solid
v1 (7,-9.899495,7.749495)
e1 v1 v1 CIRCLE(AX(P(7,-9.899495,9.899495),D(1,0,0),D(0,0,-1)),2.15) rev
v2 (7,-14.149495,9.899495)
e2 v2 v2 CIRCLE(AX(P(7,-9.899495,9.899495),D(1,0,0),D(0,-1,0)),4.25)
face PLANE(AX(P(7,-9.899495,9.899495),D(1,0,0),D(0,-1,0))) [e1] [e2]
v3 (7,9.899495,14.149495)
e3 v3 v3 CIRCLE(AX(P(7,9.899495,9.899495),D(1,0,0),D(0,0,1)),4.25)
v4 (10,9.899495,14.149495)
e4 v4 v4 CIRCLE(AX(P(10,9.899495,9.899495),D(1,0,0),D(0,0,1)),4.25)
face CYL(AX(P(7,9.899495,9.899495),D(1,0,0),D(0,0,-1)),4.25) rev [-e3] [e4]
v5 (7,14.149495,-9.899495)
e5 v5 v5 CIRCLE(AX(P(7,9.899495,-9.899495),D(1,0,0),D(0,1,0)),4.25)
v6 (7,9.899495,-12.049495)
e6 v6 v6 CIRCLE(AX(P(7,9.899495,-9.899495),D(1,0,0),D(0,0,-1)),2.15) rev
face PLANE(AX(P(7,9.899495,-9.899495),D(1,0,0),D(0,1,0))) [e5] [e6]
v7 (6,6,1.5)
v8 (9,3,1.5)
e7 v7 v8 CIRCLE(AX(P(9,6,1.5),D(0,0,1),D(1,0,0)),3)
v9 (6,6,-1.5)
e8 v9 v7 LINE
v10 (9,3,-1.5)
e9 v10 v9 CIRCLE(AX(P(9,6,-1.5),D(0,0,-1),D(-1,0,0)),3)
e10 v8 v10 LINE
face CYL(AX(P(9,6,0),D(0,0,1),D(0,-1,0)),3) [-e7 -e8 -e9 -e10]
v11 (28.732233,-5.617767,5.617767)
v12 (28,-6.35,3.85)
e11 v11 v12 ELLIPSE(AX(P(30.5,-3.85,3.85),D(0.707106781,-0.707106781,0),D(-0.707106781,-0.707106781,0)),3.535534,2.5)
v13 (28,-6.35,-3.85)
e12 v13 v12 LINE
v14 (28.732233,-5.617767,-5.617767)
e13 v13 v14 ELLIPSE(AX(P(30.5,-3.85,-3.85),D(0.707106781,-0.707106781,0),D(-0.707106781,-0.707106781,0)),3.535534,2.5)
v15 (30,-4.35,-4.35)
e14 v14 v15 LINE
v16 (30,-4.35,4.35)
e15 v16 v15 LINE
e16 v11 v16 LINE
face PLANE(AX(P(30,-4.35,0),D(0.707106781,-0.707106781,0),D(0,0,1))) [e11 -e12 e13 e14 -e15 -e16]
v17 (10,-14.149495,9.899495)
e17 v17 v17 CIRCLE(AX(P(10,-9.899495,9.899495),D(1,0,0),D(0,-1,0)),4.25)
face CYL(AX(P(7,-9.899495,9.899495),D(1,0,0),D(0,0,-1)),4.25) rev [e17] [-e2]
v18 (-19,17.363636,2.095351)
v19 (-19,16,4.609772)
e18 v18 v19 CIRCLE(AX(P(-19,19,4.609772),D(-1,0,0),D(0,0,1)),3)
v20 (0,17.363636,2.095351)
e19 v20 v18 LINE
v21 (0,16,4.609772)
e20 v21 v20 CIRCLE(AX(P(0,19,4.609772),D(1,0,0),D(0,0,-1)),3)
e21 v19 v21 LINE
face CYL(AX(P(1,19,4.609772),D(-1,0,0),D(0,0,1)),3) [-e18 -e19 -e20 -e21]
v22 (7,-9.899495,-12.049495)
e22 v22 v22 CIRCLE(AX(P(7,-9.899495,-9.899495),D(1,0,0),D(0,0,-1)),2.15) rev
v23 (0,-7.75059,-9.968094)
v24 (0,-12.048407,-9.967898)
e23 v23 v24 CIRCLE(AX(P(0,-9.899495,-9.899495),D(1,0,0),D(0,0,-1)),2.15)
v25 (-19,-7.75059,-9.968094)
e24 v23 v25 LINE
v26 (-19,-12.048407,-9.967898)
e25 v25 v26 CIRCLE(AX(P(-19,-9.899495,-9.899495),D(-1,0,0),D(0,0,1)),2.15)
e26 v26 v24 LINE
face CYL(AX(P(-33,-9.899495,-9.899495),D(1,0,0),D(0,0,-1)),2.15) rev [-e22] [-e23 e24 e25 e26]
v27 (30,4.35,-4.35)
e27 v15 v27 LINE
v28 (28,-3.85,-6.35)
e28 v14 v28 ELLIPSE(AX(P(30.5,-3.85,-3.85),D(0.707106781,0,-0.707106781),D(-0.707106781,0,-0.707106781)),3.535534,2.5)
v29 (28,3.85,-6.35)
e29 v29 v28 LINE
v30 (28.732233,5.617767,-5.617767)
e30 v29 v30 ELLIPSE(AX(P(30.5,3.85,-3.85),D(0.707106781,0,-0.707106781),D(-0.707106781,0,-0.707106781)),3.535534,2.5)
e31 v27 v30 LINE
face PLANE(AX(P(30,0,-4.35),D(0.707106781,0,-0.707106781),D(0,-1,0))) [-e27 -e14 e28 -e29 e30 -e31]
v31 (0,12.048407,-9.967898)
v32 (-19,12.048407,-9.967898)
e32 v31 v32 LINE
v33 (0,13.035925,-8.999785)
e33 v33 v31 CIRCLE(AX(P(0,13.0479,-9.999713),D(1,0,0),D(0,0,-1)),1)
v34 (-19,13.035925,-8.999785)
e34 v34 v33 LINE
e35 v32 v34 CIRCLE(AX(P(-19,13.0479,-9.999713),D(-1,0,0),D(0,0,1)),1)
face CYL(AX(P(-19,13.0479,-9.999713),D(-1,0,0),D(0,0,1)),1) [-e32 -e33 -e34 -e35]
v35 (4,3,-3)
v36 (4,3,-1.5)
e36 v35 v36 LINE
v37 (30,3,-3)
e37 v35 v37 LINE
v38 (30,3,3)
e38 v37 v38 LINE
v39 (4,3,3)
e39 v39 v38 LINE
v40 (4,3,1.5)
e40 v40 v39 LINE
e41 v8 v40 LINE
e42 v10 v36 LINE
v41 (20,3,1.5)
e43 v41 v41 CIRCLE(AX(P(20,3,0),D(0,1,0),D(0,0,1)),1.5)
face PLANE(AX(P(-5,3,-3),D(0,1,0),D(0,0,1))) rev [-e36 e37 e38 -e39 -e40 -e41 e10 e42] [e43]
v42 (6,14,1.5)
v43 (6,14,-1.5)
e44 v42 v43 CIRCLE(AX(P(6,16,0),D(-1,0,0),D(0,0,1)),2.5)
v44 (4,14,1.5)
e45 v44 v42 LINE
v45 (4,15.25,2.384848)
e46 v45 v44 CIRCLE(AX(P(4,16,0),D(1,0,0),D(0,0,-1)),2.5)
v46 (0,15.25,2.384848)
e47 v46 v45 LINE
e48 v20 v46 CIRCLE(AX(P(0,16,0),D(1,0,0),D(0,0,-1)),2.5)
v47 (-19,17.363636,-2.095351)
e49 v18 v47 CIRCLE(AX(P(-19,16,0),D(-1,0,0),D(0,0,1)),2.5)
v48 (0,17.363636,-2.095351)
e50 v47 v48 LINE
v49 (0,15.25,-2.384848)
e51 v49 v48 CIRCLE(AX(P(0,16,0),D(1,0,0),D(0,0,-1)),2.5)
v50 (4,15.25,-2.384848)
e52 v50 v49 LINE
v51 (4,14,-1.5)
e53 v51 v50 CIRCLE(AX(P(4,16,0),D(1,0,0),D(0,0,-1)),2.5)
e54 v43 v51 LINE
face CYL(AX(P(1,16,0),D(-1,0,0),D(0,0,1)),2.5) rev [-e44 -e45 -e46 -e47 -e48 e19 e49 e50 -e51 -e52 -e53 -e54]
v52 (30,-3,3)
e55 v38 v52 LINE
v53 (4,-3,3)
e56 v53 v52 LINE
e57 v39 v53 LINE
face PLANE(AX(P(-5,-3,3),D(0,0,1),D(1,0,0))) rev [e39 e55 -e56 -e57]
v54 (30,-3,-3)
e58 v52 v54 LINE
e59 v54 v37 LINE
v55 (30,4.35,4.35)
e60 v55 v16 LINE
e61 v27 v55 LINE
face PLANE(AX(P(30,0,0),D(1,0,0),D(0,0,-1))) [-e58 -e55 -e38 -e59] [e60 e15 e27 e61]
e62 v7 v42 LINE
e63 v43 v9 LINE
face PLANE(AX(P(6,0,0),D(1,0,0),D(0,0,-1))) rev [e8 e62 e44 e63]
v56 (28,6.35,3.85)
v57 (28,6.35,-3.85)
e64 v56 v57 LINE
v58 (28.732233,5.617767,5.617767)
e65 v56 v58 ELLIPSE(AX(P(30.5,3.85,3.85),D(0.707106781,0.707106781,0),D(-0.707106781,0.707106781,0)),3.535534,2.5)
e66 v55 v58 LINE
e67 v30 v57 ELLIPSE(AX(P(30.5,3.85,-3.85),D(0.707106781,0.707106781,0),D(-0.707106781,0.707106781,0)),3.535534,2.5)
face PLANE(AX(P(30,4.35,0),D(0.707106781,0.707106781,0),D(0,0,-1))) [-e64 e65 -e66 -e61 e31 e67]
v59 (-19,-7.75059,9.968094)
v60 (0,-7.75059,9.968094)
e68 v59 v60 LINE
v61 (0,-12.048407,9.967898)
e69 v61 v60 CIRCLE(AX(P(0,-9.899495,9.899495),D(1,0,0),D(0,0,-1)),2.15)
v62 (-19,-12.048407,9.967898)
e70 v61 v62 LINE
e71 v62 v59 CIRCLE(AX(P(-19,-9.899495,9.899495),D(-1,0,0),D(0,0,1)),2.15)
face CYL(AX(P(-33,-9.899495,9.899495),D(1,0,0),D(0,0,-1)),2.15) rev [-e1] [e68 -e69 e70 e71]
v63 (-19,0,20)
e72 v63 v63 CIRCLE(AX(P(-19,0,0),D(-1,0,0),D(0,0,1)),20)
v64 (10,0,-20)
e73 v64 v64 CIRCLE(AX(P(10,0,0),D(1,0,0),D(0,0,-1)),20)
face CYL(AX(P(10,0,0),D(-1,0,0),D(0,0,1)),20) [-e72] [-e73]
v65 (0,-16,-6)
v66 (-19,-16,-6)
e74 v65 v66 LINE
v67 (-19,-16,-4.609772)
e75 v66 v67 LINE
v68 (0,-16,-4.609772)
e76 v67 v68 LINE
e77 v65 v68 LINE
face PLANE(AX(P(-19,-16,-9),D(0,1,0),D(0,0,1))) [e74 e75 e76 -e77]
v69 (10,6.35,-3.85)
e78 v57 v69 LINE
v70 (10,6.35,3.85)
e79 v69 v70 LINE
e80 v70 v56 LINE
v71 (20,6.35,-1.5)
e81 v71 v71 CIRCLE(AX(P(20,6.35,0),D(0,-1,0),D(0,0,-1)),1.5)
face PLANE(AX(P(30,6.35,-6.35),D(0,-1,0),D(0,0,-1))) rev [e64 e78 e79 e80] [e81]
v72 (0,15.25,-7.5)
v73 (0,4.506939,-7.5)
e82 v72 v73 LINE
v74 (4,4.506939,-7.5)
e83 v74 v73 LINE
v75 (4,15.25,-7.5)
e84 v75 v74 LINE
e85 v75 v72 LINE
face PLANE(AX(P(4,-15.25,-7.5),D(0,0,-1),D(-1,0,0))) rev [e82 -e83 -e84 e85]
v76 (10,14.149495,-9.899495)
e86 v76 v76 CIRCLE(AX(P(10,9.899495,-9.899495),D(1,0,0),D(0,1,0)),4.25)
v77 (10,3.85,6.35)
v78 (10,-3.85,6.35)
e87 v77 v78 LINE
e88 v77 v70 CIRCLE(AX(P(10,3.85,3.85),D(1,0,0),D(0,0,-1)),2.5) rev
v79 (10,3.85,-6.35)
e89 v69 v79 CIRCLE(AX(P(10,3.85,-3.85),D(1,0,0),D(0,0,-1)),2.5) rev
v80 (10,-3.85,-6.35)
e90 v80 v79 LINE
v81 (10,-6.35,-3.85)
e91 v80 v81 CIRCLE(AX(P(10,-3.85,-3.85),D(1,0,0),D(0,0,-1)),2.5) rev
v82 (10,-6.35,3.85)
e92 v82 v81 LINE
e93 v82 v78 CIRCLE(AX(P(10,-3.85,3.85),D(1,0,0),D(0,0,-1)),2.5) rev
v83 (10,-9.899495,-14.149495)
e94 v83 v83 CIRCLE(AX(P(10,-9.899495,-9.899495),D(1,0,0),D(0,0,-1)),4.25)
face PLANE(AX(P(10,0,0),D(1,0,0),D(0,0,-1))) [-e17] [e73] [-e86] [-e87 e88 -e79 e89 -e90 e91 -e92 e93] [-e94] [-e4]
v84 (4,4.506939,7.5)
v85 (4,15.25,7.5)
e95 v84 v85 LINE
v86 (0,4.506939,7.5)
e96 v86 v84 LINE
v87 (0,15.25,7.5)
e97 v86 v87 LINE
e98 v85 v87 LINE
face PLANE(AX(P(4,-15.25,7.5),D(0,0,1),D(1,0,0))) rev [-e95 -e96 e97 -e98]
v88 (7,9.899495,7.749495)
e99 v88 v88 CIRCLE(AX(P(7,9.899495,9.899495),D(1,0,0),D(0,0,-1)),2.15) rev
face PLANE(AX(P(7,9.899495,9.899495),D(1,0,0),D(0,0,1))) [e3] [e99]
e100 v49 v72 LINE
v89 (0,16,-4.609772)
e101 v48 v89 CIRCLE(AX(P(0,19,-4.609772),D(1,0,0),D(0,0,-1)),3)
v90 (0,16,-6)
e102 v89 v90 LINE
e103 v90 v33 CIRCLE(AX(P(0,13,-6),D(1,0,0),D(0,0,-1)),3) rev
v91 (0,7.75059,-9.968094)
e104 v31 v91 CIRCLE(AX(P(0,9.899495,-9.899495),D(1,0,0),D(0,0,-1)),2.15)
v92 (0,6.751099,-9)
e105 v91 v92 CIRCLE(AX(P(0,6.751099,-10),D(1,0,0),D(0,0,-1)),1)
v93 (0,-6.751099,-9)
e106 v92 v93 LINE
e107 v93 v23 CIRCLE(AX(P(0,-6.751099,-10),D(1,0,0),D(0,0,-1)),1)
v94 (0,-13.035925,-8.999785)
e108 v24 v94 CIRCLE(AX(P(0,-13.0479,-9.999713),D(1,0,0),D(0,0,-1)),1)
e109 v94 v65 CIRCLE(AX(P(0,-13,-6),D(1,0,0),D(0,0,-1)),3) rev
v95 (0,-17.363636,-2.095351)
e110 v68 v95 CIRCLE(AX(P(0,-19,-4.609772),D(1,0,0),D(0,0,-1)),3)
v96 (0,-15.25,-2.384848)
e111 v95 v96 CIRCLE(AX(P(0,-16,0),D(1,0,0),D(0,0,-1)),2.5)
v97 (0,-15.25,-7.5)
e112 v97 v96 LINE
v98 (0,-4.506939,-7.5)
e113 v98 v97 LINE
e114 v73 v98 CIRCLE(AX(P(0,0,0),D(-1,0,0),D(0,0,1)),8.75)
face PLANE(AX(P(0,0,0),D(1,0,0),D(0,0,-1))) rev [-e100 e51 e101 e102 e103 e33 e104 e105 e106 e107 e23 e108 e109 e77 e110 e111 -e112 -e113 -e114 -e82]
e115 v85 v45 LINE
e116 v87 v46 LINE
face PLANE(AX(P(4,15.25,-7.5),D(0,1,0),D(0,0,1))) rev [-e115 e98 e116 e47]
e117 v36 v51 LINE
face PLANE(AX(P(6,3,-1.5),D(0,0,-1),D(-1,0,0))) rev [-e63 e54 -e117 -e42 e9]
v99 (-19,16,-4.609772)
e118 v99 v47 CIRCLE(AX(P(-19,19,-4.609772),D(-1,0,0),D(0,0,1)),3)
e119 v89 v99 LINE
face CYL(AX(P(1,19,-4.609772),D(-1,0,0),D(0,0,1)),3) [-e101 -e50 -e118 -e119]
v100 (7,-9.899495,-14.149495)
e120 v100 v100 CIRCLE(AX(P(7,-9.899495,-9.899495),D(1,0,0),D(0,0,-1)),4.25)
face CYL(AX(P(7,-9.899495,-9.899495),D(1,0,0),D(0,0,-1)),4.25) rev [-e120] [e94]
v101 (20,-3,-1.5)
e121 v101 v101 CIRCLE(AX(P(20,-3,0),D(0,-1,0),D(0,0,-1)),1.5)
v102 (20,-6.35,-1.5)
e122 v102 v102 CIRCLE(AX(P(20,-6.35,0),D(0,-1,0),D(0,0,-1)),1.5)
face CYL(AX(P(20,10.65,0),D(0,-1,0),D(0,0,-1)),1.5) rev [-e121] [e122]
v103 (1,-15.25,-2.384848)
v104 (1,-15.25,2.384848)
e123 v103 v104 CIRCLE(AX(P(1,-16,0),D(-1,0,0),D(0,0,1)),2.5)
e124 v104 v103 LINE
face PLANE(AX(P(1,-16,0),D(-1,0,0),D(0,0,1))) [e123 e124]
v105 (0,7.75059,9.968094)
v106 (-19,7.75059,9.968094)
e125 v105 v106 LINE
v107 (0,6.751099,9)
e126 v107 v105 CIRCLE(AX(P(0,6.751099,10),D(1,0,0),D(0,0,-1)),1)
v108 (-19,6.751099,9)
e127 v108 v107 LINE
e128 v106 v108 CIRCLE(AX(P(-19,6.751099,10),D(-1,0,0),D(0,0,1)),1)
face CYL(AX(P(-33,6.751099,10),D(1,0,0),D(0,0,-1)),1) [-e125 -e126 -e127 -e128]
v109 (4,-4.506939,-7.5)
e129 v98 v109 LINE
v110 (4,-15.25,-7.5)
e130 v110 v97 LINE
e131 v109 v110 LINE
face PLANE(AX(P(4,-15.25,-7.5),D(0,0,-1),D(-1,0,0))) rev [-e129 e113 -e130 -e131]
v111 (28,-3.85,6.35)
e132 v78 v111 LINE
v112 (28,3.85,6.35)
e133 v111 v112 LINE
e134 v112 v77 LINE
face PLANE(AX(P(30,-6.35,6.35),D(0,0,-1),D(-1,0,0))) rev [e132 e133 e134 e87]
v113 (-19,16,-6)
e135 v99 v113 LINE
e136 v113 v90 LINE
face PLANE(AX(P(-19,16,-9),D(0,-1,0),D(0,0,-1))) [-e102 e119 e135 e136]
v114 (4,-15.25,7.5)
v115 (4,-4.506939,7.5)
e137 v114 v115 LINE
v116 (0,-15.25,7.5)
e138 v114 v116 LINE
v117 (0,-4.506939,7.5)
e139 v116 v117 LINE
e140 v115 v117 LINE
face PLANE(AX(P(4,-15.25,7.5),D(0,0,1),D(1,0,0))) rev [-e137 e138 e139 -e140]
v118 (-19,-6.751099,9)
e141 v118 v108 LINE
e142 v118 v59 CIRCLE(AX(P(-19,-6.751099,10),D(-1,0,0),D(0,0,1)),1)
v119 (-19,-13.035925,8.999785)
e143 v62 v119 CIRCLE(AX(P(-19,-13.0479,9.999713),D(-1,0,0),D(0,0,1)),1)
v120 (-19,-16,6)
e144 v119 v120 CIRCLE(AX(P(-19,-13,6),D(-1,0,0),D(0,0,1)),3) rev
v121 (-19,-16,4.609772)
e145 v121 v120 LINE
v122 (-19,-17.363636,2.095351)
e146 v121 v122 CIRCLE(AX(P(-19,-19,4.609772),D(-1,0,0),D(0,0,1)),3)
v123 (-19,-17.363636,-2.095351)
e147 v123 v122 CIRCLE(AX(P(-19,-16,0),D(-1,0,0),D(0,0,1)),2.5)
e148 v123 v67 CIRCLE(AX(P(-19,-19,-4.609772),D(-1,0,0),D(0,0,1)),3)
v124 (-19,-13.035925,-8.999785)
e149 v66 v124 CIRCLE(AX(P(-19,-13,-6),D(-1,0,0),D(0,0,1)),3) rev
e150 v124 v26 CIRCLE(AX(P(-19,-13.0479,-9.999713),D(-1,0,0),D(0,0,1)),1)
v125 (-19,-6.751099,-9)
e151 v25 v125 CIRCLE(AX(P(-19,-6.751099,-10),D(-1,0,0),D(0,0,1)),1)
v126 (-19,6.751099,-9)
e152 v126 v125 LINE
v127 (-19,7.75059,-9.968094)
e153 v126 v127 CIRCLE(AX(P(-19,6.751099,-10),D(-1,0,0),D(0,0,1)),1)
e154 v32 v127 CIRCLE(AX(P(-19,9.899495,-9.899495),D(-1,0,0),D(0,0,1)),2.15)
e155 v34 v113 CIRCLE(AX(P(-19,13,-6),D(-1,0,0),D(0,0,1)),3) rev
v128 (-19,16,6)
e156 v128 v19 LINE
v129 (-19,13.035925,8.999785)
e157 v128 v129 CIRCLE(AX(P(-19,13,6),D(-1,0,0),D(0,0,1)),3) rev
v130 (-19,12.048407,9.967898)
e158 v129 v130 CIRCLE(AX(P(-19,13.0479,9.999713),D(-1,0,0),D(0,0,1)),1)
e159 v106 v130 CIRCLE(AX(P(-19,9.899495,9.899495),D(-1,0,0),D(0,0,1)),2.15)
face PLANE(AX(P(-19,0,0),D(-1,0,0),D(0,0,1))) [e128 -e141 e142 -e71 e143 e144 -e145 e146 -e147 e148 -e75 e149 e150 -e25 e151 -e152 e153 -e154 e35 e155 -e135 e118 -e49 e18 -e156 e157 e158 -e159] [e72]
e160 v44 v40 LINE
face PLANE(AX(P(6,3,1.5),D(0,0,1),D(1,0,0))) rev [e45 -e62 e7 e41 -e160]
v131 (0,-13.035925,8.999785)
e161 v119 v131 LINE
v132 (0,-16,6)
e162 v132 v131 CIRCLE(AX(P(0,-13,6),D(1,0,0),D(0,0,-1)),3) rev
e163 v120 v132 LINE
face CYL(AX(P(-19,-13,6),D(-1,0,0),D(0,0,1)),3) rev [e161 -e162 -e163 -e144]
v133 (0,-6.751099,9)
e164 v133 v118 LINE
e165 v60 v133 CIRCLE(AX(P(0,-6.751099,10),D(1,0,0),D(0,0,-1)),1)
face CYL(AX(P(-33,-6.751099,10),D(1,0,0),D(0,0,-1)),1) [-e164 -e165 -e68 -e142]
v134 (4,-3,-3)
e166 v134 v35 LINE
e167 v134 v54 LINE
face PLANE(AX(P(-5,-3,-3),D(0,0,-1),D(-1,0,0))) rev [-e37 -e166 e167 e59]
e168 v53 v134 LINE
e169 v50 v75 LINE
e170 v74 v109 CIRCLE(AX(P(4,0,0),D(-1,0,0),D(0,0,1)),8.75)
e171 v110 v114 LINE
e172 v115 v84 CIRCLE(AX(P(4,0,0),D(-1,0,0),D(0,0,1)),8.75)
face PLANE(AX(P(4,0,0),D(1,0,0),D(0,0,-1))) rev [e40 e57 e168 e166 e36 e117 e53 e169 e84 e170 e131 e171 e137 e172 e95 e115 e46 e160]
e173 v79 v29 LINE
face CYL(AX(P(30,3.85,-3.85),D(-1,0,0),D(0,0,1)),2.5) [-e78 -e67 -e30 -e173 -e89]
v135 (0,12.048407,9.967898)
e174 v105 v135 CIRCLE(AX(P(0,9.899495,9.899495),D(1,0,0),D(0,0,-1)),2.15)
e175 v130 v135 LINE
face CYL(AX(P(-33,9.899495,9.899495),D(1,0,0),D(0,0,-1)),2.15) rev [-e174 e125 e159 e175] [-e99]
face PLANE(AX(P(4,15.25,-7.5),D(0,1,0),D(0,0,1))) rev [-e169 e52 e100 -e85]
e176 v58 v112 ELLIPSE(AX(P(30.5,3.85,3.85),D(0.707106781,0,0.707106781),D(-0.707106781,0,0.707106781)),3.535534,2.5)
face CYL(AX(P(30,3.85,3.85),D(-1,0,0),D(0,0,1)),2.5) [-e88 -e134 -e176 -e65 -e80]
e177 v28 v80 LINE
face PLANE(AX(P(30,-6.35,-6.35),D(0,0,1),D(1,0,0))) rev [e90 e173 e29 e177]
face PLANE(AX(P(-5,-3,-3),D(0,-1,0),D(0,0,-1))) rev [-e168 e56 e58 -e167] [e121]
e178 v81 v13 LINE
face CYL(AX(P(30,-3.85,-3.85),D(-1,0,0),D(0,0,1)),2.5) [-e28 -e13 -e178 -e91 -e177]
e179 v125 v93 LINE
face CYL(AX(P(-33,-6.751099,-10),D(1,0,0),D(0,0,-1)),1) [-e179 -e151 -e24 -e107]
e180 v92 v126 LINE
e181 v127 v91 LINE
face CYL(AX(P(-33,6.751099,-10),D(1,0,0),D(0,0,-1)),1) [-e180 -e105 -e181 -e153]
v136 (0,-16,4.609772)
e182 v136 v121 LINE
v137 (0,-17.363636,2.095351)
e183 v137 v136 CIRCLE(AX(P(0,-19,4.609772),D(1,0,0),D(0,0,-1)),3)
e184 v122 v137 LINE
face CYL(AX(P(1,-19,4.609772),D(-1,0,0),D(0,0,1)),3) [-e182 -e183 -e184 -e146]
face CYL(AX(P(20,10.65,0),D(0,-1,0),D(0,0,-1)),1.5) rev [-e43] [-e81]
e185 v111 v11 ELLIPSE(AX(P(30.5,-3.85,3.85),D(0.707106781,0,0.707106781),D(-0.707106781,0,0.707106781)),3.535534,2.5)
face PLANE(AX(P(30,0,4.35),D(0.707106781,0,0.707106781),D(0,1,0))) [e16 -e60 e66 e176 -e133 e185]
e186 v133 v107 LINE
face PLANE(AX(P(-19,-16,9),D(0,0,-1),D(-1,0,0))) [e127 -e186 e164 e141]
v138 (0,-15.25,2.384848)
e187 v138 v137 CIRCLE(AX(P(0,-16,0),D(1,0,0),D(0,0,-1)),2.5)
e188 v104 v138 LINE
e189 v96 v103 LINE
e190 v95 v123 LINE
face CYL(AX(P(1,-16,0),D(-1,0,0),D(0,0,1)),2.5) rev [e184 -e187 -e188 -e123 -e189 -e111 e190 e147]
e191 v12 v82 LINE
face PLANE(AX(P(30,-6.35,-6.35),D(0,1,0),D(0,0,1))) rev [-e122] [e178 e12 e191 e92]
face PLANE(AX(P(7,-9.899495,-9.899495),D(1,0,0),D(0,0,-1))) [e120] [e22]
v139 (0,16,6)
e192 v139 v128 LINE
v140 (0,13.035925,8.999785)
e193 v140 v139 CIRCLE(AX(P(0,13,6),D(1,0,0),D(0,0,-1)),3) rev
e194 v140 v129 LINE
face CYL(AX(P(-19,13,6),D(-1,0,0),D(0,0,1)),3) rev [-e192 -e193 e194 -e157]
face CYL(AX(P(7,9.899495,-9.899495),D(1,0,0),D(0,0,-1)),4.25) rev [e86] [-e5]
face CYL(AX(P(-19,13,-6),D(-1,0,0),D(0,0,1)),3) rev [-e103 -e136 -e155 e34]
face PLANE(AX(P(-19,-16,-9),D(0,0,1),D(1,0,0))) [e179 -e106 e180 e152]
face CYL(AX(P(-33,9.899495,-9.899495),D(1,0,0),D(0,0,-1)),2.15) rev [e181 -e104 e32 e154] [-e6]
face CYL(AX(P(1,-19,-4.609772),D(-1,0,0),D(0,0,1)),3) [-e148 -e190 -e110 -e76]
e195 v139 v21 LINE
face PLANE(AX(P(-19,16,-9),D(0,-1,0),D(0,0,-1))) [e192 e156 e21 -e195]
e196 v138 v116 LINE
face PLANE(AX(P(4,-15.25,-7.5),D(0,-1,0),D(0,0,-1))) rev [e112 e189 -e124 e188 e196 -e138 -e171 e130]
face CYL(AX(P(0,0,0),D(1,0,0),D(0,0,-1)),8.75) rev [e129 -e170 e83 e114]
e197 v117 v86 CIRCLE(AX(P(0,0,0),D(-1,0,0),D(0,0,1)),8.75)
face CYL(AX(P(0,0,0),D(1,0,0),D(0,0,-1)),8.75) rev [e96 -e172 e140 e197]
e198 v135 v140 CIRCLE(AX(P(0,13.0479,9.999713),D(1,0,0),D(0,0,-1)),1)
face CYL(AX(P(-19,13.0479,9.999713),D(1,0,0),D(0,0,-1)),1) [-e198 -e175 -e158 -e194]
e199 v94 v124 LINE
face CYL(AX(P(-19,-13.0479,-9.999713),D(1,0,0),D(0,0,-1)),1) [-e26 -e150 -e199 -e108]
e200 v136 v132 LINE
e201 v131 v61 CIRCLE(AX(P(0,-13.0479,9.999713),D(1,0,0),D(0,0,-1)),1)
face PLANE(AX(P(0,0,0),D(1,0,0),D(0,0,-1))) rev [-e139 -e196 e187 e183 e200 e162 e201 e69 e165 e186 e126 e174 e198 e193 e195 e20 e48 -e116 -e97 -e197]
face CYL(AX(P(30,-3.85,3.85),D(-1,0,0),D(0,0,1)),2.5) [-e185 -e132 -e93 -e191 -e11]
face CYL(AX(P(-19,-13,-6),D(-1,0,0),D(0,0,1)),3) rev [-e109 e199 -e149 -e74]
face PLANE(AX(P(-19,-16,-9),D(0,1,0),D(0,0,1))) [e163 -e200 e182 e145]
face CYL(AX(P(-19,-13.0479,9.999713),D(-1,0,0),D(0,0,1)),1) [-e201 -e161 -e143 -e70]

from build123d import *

# Parameters (mm, degrees)
SKETCH_1_R               = 20
EXTRUDE_1_DEPTH          = 10
SKETCH_2_W               = 15
SKETCH_2_H               = 30.5
CUT_EXTRUDE_1_DEPTH      = 4
SKETCH_3_R               = 8.75
CUT_EXTRUDE_2_DEPTH      = 4
EXTRUDE_START            = 19
SKETCH_4_R               = 20
SKETCH_4_W               = 18
SKETCH_4_H               = 32
EXTRUDE_2_DEPTH          = 19
FILLET_1_R               = 3
SKETCH_5_R               = 2.5
CUT_EXTRUDE_3_DEPTH      = 20
FILLET_2_R               = 3
SKETCH_6_R               = 2.15
CUT_EXTRUDE_4_DEPTH      = 43
FILLET_3_R               = 1
SKETCH_7_R               = 4.25
CUT_EXTRUDE_5_DEPTH      = 3
PATTERN_CIRCULAR_1_COUNT = 4
SKETCH_8_W               = 12.7
SKETCH_8_H               = 12.7
EXTRUDE_3_DEPTH          = 20
SKETCH_9_W               = 6
SKETCH_9_H               = 6
CUT_EXTRUDE_6_DEPTH      = 35
SKETCH_10_W              = 3
SKETCH_10_H              = 15
CUT_EXTRUDE_7_DEPTH      = 5
SKETCH_11_R              = 2.5
CUT_EXTRUDE_8_DEPTH      = 5
SKETCH_12_R              = 1.5
CUT_EXTRUDE_9_DEPTH      = 17
CHAMFER_1_SIZE           = 2
FILLET_4_R               = 3
FILLET_5_R               = 2.5


with BuildPart() as part:
    # 草图1 → 凸台-拉伸1 (new body)
    with BuildSketch(Plane(origin=(0, 0, 0), x_dir=(0, 0, -1), z_dir=(1, 0, 0))):
        Circle(SKETCH_1_R)
    extrude(amount=EXTRUDE_1_DEPTH)

    # 草图2 → 切除-拉伸1 (cut)
    with BuildSketch(Plane.ZY):
        Rectangle(SKETCH_2_W, SKETCH_2_H)
    extrude(amount=-CUT_EXTRUDE_1_DEPTH, mode=Mode.SUBTRACT)

    # 草图3 → 切除-拉伸2 (cut)
    with BuildSketch(Plane.ZY.offset(-4)):
        Circle(SKETCH_3_R)
    extrude(amount=CUT_EXTRUDE_2_DEPTH, mode=Mode.SUBTRACT)

    # 草图4 → 凸台-拉伸2 (add)
    with BuildSketch(Plane.ZY.offset(EXTRUDE_START)):
        Circle(SKETCH_4_R)
        Rectangle(SKETCH_4_W, SKETCH_4_H, mode=Mode.SUBTRACT)
    extrude(amount=-EXTRUDE_2_DEPTH)

    # 圆角1
    fillet_1_edges = [part.edges().sort_by_distance(p)[0] for p in [
        (-9.5, 16, 9),
        (-9.5, 16, -9),
        (-9.5, -16, -9),
        (-9.5, -16, 9),
    ]]
    fillet(fillet_1_edges, radius=FILLET_1_R)

    # 草图5 → 切除-拉伸3 (cut)
    with BuildSketch(Plane.ZY.offset(19)):
        with Locations((0, -16)):
            Circle(SKETCH_5_R)
        with Locations((0, 16)):
            Circle(SKETCH_5_R)
    extrude(amount=-CUT_EXTRUDE_3_DEPTH, mode=Mode.SUBTRACT)

    # 圆角2
    # the kernel refuses this fillet: 3 mm, written as the material it takes off along each edge
    with BuildSketch(Plane(origin=(-24.274430572, -16, 2.5), x_dir=(0, -0.9586814917396833, -0.2844816292764363), z_dir=(1, 0, 0))) as fillet_2_piece_1:
        with BuildLine():
            CenterArc((2.275853034, -2.876044475), FILLET_2_R, 106.527865575, 56.944268849)
            Line((-0.600191441, -2.022599587), (0, 0))
            ThreePointArc((0, 0), (0.711204073, -0.103296271), (1.422408146, 0))
        make_face()
    extrude(amount=24.274430572, mode=Mode.SUBTRACT)
    with BuildSketch(Plane(origin=(0, -16, -2.5), x_dir=(0, 0, -1), z_dir=(-1, 0, 0))) as fillet_2_piece_2:
        with BuildLine():
            CenterArc((2.109772229, 3), FILLET_2_R, 213.055731151, 56.944268849)
            ThreePointArc((-0.404648987, 1.363636364), (-0.103296271, 0.711204073), (0, 0))
            Line((0, 0), (2.109772229, 0))
        make_face()
    extrude(amount=24.274430572, mode=Mode.SUBTRACT)
    with BuildSketch(Plane(origin=(0, 16, -2.5), x_dir=(0, 0.9586814917396834, 0.2844816292764354), z_dir=(-1, 0, 0))) as fillet_2_piece_3:
        with BuildLine():
            CenterArc((2.275853034, 2.876044475), FILLET_2_R, 196.527865575, 56.944268849)
            Line((-0.600191441, 2.022599587), (0, 0))
            ThreePointArc((0, 0), (0.711204073, 0.103296271), (1.422408146, 0))
        make_face()
    extrude(amount=24.274430572, mode=Mode.SUBTRACT)
    with BuildSketch(Plane(origin=(-24.274430572, 16, 2.5), x_dir=(0, 0, 1), z_dir=(1, 0, 0))) as fillet_2_piece_4:
        with BuildLine():
            CenterArc((2.109772229, -3), FILLET_2_R, 90, 56.944268849)
            ThreePointArc((-0.404648987, -1.363636364), (-0.103296271, -0.711204073), (0, 0))
            Line((0, 0), (2.109772229, 0))
        make_face()
    extrude(amount=24.274430572, mode=Mode.SUBTRACT)

    # 草图6 → 切除-拉伸4 (cut)
    with BuildSketch(Plane(origin=(10, 0, 0), x_dir=(0, 0, -1), z_dir=(1, 0, 0))):
        with Locations((9.899494937, -9.899494937)):
            Circle(SKETCH_6_R)
        with Locations((-9.899494937, -9.899494937)):
            Circle(SKETCH_6_R)
        with Locations((-9.899494937, 9.899494937)):
            Circle(SKETCH_6_R)
        with Locations((9.899494937, 9.899494937)):
            Circle(SKETCH_6_R)
    extrude(amount=-CUT_EXTRUDE_4_DEPTH, mode=Mode.SUBTRACT)

    # 圆角3
    # the kernel refuses this fillet: 1 mm, written as the material it takes off along each edge
    with BuildSketch(Plane(origin=(-21.98900269, -7.946699797, 9), x_dir=(0, 0.1985408891964352, 0.9800926054802622), z_dir=(1, 0, 0)), Plane(origin=(-21.98900269, 7.946699797, -9), x_dir=(0, -0.19854088919647347, -0.9800926054802545), z_dir=(1, 0, 0))) as fillet_3_piece_1:
        with BuildLine():
            CenterArc((1.217468306, -0.973258884), FILLET_3_R, 103.280057781, 88.171589383)
            Line((0.237375701, -1.171799774), (0, 0))
            ThreePointArc((0, 0), (0.493878653, -0.057493399), (0.987757305, 0))
        make_face()
    extrude(amount=21.98900269, mode=Mode.SUBTRACT)
    with BuildSketch(Plane(origin=(-21.959087911, -11.852290077, 9), x_dir=(0, -0.999999983485678, -0.00018173784322620402), z_dir=(1, 0, 0)), Plane(origin=(-21.959087911, 11.852290077, -9), x_dir=(0, 0.9999999834856781, 0.00018173784322619477), z_dir=(1, 0, 0))) as fillet_3_piece_2:
        with BuildLine():
            CenterArc((1.195428513, -0.999930456), FILLET_3_R, 90.675724778, 87.490671362)
            Line((0.195940547, -0.967933494), (0.09599175, -0.964733798))
            ThreePointArc((0.09599175, -0.964733798), (0.056286672, -0.492404834), (-0.090835283, -0.041820466))
            Line((-0.090835283, -0.041820466), (1.8174e-05, 0.099999998))
            ThreePointArc((1.8174e-05, 0.099999998), (1.147728078, 0.099791416), (1.182455829, 0.099993046))
            Line((1.182455829, 0.099993046), (1.183635164, 0))
        make_face()
    extrude(amount=21.959087911, mode=Mode.SUBTRACT)
    with BuildSketch(Plane(origin=(-21.959087911, -11.852290077, -9), x_dir=(0, -0.19858553154825268, -0.98008356105982), z_dir=(1, 0, 0)), Plane(origin=(-21.959087911, 11.852290077, 9), x_dir=(0, 0.19858553154822475, 0.9800835610598256), z_dir=(1, 0, 0))) as fillet_3_piece_3:
        with BuildLine():
            CenterArc((1.217233349, -0.973269347), FILLET_3_R, 103.277447997, 87.490671362)
            Line((0.234841987, -1.160104066), (0.136602851, -1.178787538))
            ThreePointArc((0.136602851, -1.178787538), (0.129910229, -1.144710182), (-0.098008356, -0.019858553))
            Line((-0.098008356, -0.019858553), (0.022966667, 0.097326935))
            ThreePointArc((0.022966667, 0.097326935), (0.49378334, 0.042529095), (0.964600013, 0.097326935))
            Line((0.964600013, 0.097326935), (0.987566679, 0))
        make_face()
    extrude(amount=21.959087911, mode=Mode.SUBTRACT)
    with BuildSketch(Plane(origin=(-21.98900269, -7.946699797, -9), x_dir=(0, 1, 0), z_dir=(1, 0, 0)), Plane(origin=(-21.98900269, 7.946699797, 9), x_dir=(0, -1, 0), z_dir=(1, 0, 0))) as fillet_3_piece_4:
        with BuildLine():
            CenterArc((1.195601076, -1), FILLET_3_R, 90, 88.171589383)
            ThreePointArc((0.196110214, -0.968093631), (0.154403962, -0.472632025), (0, 0))
            Line((0, 0), (1.195601076, 0))
        make_face()
    extrude(amount=21.98900269, mode=Mode.SUBTRACT)

    # 草图7 → 切除-拉伸5 (cut)
    with BuildSketch(Plane(origin=(10, 0, 0), x_dir=(0, 0, -1), z_dir=(1, 0, 0))):
        with Locations((9.899494937, -9.899494937)):
            Circle(SKETCH_7_R)
    cut_extrude_5 = extrude(amount=-CUT_EXTRUDE_5_DEPTH, mode=Mode.SUBTRACT)

    # 阵列(圆周)1: 切除-拉伸5 ×4 about axis
    pattern_circular_1_axis = Axis((0, 0, 0), (1, 0, 0))
    for i in range(1, PATTERN_CIRCULAR_1_COUNT):
        add(cut_extrude_5.rotate(pattern_circular_1_axis, i * 360 / PATTERN_CIRCULAR_1_COUNT), mode=Mode.SUBTRACT)

    # 草图8 → 凸台-拉伸3 (add)
    with BuildSketch(Plane(origin=(10, 0, 0), x_dir=(0, 0, -1), z_dir=(1, 0, 0))):
        Rectangle(SKETCH_8_W, SKETCH_8_H)
    extrude(amount=EXTRUDE_3_DEPTH)

    # 草图9 → 切除-拉伸6 (cut)
    with BuildSketch(Plane(origin=(30, 0, 0), x_dir=(0, 0, -1), z_dir=(1, 0, 0))):
        Rectangle(SKETCH_9_W, SKETCH_9_H)
    extrude(amount=-CUT_EXTRUDE_6_DEPTH, mode=Mode.SUBTRACT)

    # 草图10 → 切除-拉伸7 (cut)
    with BuildSketch(Plane.ZY.offset(-1)):
        with Locations((0, 10.5)):
            Rectangle(SKETCH_10_W, SKETCH_10_H)
    extrude(amount=-CUT_EXTRUDE_7_DEPTH, mode=Mode.SUBTRACT)

    # 草图11 → 切除-拉伸8 (cut)
    with BuildSketch(Plane.ZY.offset(-1)):
        with Locations((0, 16)):
            Circle(SKETCH_11_R)
    extrude(amount=-CUT_EXTRUDE_8_DEPTH, mode=Mode.SUBTRACT)

    # 草图12 → 切除-拉伸9 (cut)
    with BuildSketch(Plane.XZ.offset(6.35)):
        with Locations(Location((20, 0, 0), (0, 0, 270))):
            Circle(SKETCH_12_R)
    extrude(amount=-CUT_EXTRUDE_9_DEPTH, mode=Mode.SUBTRACT)

    # 倒角1
    chamfer_1_edges = [part.edges().sort_by_distance(p)[0] for p in [
        (30, 0, 6.35),
        (30, -6.35, 0),
        (30, 0, -6.35),
        (30, 6.35, 0),
    ]]
    chamfer(chamfer_1_edges, length=CHAMFER_1_SIZE)

    # 圆角4
    fillet_4_edges = [part.edges().sort_by_distance(p)[0] for p in [
        (6, 3, 0),
    ]]
    fillet(fillet_4_edges, radius=FILLET_4_R)

    # 圆角5
    fillet_5_edges = [part.edges().sort_by_distance(p)[0] for p in [
        (19, -6.35, 6.35),
        (19, 6.35, 6.35),
        (19, 6.35, -6.35),
        (19, -6.35, -6.35),
    ]]
    fillet(fillet_5_edges, radius=FILLET_5_R)


solid = part.part
